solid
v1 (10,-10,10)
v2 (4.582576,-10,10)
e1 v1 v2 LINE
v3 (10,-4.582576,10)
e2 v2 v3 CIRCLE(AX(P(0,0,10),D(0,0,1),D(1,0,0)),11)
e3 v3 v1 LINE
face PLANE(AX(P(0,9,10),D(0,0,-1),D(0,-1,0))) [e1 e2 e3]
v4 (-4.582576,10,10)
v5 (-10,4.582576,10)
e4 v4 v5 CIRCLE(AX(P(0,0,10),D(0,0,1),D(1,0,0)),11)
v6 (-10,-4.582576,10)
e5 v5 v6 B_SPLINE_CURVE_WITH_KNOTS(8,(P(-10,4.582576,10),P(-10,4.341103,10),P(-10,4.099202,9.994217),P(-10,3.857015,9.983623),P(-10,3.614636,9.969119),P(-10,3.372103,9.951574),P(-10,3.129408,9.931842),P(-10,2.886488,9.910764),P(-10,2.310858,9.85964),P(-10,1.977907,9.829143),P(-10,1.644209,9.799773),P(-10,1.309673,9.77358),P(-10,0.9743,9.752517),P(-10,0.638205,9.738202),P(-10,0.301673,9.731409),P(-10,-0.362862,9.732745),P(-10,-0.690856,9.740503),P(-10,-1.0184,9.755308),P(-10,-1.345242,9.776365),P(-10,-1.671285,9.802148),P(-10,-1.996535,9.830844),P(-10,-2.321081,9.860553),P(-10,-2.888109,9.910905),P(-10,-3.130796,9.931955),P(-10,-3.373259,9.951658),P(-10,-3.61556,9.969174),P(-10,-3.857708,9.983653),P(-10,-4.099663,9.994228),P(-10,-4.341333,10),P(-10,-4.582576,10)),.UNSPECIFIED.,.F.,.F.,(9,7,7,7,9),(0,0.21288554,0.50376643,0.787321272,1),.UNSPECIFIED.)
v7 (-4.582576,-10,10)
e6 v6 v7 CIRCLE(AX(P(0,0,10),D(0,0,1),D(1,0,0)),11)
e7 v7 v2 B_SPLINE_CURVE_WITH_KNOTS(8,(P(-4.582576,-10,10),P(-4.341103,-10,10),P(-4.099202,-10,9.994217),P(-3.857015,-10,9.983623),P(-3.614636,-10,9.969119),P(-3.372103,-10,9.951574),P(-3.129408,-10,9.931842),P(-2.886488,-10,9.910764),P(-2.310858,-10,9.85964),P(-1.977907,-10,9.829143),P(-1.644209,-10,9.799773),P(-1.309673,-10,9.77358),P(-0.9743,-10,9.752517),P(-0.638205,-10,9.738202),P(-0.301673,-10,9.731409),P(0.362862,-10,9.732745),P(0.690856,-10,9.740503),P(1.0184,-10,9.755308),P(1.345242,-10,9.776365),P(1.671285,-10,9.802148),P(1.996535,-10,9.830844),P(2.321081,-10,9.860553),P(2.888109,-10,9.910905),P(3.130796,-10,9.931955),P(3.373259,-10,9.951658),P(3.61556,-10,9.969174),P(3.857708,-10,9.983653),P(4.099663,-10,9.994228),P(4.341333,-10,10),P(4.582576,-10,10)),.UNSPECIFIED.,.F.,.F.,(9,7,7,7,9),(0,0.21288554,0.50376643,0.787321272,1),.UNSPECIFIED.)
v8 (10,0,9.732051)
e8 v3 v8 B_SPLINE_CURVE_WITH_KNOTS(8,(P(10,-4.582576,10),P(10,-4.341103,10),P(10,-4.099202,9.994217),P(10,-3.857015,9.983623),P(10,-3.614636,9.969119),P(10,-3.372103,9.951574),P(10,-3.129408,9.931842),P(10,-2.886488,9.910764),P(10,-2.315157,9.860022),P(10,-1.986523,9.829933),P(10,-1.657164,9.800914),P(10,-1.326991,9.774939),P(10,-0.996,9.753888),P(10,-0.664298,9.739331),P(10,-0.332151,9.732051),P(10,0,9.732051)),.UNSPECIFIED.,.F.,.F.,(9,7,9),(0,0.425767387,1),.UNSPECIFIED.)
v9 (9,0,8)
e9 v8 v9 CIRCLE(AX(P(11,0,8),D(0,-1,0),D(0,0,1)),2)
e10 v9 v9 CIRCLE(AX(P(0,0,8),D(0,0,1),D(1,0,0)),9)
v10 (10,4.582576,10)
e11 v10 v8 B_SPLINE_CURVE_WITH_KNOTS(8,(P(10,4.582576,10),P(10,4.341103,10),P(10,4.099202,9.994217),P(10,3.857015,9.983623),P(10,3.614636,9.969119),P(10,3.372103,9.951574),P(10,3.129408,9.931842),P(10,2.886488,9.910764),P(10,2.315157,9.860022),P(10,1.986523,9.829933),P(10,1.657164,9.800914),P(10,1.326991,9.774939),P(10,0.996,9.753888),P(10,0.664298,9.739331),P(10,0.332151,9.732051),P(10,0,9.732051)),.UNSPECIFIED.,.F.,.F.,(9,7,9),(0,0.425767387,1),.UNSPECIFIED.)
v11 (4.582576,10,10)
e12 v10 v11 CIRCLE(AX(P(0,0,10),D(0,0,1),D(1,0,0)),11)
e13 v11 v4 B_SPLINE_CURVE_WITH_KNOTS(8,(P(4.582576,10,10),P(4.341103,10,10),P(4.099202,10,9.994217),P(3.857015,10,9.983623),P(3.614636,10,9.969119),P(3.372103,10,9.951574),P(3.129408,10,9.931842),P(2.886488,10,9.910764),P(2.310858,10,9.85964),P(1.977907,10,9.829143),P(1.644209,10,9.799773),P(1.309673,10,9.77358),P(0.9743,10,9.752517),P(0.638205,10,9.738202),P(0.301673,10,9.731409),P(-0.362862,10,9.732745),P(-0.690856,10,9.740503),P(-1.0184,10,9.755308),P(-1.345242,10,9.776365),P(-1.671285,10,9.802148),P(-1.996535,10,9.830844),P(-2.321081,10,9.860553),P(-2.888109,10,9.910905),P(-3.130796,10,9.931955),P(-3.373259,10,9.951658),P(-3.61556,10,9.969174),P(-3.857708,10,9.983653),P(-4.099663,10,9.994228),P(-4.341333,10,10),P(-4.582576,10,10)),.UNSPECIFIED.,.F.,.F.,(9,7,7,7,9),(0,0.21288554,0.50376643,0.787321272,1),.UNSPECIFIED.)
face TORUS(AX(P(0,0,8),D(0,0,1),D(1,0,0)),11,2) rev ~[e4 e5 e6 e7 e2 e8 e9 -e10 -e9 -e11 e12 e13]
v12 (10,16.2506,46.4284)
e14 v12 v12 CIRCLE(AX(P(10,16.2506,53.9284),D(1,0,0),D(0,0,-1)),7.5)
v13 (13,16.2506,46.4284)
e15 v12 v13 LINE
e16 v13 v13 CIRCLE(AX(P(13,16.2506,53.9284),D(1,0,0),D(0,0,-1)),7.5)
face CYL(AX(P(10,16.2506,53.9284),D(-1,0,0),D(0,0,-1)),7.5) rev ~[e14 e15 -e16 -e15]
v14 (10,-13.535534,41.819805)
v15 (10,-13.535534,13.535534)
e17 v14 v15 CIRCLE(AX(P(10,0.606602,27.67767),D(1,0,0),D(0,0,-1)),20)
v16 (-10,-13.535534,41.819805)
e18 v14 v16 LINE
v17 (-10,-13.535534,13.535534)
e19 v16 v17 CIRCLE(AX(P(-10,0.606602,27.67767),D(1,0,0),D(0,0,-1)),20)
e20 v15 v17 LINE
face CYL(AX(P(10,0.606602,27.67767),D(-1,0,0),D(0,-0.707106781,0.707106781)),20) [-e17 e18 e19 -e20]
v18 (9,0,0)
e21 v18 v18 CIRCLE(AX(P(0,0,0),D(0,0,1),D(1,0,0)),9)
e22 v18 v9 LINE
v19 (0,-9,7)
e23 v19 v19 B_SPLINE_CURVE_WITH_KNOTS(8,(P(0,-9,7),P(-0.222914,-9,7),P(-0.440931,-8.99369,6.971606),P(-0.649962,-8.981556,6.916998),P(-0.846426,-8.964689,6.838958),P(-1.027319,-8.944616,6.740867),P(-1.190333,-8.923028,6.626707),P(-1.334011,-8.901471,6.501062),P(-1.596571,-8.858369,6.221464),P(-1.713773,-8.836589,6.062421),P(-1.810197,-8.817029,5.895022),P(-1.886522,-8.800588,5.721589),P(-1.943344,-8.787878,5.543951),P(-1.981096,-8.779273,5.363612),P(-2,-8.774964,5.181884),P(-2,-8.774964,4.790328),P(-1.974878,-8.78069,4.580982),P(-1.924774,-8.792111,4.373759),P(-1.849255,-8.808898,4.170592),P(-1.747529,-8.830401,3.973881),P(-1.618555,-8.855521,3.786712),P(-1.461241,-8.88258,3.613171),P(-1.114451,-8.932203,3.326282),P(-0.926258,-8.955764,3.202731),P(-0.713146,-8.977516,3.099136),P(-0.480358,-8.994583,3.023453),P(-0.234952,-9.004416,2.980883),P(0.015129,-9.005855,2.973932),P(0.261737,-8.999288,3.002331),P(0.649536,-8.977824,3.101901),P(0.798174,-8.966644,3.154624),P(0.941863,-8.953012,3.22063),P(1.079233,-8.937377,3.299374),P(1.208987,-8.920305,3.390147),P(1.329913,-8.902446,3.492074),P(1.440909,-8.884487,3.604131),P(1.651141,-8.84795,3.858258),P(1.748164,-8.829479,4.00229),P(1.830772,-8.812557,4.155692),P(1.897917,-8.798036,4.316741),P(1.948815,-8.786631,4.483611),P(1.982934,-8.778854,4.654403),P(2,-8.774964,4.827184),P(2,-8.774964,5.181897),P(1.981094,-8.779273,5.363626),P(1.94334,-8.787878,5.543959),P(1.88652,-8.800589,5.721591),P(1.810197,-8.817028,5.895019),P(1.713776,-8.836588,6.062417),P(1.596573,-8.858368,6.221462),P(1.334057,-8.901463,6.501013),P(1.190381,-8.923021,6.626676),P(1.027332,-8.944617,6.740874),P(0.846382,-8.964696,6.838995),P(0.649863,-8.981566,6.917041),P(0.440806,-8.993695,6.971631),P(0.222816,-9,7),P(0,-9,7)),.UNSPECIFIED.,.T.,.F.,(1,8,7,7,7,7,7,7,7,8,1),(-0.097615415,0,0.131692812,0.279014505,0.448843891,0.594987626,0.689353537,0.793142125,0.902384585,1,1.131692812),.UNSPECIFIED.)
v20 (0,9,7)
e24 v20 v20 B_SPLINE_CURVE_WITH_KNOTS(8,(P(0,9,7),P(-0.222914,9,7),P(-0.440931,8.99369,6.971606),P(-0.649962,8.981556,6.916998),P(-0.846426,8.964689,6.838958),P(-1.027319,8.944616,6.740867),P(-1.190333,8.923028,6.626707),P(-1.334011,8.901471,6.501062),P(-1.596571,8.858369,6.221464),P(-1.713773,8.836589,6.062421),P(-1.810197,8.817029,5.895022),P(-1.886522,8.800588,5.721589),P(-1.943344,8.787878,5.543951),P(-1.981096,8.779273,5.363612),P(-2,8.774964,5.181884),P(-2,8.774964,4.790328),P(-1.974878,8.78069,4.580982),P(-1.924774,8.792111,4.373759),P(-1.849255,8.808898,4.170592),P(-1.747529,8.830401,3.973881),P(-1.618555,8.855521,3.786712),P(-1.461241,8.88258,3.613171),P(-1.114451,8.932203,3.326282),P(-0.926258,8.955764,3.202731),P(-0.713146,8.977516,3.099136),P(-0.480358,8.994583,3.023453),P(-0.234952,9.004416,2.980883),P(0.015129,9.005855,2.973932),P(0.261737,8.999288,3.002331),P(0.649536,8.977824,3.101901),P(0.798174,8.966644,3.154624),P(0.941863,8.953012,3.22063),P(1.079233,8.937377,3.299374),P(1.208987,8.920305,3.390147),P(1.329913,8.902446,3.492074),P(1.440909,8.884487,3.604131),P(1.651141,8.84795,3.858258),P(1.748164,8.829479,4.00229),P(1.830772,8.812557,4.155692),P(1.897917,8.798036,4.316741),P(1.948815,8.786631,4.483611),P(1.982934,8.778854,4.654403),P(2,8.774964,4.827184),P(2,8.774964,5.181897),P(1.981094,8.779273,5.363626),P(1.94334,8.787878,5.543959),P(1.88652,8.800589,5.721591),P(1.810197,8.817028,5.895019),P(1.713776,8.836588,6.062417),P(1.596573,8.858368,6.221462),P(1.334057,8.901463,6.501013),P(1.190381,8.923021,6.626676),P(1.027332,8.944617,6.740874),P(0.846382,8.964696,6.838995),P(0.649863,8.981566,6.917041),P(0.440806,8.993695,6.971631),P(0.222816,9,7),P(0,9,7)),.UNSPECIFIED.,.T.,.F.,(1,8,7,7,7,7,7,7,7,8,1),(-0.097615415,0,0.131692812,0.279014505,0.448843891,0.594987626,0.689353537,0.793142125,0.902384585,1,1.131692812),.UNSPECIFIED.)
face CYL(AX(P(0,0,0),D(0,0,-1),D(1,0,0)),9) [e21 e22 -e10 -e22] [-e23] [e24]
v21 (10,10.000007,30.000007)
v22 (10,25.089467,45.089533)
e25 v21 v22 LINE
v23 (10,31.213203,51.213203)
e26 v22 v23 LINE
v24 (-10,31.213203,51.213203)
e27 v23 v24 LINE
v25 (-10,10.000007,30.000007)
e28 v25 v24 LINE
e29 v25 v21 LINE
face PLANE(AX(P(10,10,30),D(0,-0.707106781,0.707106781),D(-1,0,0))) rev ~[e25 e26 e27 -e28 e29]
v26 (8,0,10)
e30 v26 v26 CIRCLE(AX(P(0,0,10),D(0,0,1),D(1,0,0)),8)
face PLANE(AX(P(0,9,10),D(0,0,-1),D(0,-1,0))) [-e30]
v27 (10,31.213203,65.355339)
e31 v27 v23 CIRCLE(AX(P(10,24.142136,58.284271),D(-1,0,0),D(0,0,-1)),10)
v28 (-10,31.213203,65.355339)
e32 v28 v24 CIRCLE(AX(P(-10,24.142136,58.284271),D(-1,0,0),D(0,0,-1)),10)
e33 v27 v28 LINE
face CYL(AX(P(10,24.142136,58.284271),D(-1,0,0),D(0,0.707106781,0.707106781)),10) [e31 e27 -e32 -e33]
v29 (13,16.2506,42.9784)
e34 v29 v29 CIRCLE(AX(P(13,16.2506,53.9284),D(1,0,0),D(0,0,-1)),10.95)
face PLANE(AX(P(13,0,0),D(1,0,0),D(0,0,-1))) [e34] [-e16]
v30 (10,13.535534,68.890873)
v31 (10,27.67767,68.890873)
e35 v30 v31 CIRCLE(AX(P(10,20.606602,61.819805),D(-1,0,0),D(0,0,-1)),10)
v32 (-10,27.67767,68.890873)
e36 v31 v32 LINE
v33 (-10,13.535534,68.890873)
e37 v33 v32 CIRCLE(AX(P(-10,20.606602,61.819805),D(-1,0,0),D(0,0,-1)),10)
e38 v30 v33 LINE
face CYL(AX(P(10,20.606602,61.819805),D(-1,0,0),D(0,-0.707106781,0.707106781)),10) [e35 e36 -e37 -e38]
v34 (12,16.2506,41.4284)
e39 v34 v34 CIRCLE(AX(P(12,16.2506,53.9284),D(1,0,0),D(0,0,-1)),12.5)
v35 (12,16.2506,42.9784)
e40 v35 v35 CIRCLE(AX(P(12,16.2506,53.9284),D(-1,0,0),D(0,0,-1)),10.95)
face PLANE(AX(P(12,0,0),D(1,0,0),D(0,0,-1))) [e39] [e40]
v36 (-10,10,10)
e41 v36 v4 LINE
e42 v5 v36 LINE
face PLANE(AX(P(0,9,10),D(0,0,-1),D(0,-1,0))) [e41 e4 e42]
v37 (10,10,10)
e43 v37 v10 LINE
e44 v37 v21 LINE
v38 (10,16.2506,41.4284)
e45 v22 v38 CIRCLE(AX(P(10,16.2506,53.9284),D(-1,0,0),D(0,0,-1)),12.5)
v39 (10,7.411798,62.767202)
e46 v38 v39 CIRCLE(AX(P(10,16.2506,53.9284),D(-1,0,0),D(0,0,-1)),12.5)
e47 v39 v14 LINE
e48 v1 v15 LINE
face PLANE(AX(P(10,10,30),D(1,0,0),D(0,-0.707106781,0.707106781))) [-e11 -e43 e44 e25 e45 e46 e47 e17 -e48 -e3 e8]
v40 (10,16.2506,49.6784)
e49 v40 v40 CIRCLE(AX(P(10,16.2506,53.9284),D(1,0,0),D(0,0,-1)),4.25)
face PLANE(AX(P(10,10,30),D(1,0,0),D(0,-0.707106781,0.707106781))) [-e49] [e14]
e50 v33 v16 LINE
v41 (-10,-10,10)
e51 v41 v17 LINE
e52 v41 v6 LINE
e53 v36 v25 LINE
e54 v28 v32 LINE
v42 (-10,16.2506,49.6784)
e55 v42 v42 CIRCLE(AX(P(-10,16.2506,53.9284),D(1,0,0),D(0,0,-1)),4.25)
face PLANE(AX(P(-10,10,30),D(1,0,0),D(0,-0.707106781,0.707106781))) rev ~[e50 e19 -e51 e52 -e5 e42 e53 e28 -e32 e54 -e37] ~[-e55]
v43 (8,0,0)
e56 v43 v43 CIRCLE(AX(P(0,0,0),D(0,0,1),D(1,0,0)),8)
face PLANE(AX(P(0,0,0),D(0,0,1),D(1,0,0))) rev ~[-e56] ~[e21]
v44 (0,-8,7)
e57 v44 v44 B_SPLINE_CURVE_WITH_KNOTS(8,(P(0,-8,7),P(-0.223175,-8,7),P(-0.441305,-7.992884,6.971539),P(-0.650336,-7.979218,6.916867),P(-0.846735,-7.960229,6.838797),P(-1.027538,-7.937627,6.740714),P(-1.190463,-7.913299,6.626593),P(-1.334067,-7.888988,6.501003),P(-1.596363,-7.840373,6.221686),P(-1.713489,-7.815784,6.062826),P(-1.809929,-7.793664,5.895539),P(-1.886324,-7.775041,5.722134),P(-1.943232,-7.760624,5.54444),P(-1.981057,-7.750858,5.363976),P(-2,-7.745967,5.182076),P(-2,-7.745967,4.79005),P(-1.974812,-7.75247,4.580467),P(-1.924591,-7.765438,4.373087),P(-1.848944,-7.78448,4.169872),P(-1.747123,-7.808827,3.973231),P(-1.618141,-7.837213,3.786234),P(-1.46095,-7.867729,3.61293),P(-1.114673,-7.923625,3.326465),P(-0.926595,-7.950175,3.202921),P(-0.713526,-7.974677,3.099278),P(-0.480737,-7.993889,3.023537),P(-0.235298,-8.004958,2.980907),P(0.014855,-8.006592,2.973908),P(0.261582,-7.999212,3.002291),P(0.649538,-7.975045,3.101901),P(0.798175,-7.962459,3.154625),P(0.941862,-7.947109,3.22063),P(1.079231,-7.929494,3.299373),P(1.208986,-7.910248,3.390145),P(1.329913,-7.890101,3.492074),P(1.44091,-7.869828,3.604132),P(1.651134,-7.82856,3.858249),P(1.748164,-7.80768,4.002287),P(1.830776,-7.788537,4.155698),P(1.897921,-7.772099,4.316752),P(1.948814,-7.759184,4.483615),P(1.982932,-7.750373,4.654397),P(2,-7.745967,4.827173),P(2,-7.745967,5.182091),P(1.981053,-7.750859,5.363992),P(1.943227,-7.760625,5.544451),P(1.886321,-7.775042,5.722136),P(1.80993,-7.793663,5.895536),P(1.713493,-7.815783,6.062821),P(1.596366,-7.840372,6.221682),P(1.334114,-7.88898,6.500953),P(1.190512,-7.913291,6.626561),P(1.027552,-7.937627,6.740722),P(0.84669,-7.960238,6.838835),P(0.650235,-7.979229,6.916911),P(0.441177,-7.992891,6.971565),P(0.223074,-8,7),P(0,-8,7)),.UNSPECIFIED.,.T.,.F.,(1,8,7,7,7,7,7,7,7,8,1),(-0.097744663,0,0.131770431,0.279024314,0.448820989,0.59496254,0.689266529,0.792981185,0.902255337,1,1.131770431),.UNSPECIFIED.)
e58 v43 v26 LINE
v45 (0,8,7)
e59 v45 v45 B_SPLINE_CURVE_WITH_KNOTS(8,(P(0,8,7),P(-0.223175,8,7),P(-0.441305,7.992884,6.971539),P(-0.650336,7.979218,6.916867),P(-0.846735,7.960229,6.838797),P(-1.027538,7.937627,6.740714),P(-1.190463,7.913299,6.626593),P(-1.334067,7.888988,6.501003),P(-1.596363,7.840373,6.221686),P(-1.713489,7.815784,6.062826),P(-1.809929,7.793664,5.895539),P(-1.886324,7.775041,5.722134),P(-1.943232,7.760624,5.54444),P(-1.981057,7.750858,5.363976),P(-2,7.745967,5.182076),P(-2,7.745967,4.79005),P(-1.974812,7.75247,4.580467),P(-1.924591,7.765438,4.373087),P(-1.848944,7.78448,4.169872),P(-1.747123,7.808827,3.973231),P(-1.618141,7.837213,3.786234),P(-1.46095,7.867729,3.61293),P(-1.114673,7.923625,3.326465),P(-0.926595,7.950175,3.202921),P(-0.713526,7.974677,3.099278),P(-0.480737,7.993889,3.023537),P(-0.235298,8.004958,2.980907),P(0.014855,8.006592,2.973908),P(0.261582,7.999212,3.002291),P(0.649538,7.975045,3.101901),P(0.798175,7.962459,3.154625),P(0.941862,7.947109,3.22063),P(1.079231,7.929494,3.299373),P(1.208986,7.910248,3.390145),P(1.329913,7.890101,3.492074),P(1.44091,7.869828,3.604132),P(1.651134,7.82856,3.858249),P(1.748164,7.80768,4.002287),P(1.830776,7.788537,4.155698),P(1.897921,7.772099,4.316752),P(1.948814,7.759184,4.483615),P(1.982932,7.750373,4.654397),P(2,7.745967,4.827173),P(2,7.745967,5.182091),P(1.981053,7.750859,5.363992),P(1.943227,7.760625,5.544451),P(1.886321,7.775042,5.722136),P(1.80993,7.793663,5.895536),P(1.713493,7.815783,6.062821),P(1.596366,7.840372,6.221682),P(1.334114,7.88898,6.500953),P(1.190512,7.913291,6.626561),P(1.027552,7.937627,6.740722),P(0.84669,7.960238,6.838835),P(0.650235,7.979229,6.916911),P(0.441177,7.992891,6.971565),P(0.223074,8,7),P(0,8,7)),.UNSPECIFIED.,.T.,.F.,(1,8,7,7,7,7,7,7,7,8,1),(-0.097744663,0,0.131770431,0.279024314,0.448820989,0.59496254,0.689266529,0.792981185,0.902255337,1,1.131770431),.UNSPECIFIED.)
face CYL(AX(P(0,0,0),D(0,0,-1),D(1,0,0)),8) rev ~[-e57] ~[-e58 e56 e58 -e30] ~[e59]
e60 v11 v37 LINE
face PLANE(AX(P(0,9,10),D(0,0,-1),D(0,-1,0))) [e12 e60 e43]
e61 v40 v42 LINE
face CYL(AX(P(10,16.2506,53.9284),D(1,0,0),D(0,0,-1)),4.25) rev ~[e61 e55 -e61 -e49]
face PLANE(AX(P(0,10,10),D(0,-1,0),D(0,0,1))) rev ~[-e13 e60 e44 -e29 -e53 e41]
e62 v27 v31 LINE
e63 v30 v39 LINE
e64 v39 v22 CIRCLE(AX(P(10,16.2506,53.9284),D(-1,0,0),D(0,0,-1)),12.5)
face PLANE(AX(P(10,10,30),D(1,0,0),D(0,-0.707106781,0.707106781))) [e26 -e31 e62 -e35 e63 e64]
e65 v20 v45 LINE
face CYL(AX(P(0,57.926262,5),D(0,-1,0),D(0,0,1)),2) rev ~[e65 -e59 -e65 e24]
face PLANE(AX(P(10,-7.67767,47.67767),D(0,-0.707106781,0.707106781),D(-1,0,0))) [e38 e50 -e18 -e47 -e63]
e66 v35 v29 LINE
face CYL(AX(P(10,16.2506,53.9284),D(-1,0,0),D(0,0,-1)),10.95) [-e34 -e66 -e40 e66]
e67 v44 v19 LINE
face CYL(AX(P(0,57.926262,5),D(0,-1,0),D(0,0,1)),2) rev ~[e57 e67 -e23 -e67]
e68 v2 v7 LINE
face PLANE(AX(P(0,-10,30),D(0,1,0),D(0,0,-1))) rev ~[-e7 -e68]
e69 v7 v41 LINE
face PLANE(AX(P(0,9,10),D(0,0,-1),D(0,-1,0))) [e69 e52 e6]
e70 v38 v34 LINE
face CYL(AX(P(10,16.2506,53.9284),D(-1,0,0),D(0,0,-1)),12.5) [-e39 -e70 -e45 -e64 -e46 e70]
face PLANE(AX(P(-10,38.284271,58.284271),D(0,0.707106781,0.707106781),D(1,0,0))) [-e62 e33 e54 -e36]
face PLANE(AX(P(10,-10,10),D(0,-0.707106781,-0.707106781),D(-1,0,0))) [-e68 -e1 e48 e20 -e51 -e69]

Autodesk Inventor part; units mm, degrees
ref_plane "YZ Plane" through (0, 0, 0) normal (1, 0, 0) x (0, 1, 0)
sketch "Esquisse1" plane through (0, 0, 0) normal (0, 0, 1) x (1, 0, 0)
  circle A0 centre (0, 0) radius 8
  circle A1 centre (0, 0) radius 9
  dimension "d0" = 16
  dimension "d1" = 18
extrude "Extrusion1" add sketch "Esquisse1" along normal blind 10
sketch "Esquisse2" plane through (0, 0, 0) normal (1, 0, 0) x (0, 1, 0)
  line L0 (9, 10) -> (-9, 10) projected
  line L1 (0, 10) -> (0, 25)
  line L2 (9, 10) -> (-9, 10)
  line L3 (0, 10) -> (10, 10)
  line L4 (10, 10) -> (10, 30)
  line L5 (10, 30) -> (-10, 30)
  line L6 (-10, 30) -> (-10, 10)
  line L7 (-10, 10) -> (0, 10)
  point P0 (0, 0)
  dimension "d26" = 10
  dimension "d27" = 20
  dimension "d28" = 20
  dimension "d29" = 90
extrude "Extrusion2" add sketch "Esquisse2" along normal mid plane 20
fillet "Congé1" radius 2 1 edges at (-9, 0, 10)
sketch "Esquisse4" plane through (0, 0, 0) normal (0, 1, 0) x (-1, 0, 0)
  line L0 (9, 0) -> (-9, 0) projected
  line L1 (9, 0) -> (0, 0)
  line L2 (0, 0) -> (0, 5)
  line L3 (0, 0) -> (5, 0) construction
  dimension "d14" = 9
  dimension "d15" = 5
  dimension "d16" = 90
hole "Perçage1" at (0, 0, 5) direction (0, -1, 0) diameter 4 end through all both
ref_plane "Plan de construction2" through (0, -8.75, 15.1554) normal (0, -0.5, 0.8660254) x (1, 0, 0)
ref_plane "Plan de construction1" through (0, 0, 0) normal (0, -0.5, 0.8660254) x (1, 0, 0)
ref_plane "Plan de construction4" through (0, -10, 10) normal (0, -0.7071068, 0.7071068) x (1, 0, 0)
ref_plane "Plan de construction3" through (0, 0, 0) normal (0, -0.7071068, 0.7071068) x (1, 0, 0)
sketch "Esquisse6" plane through (0, -10, 10) normal (0, -0.7071068, 0.7071068) x (1, 0, 0)
  line L0 (-10, 28.2843) -> (-10, 14.1421) projected
  line L1 (10, 14.1421) -> (10, 0) projected
  line L2 (-10, 28.2843) -> (10, 28.2843)
  line L3 (10, 28.2843) -> (10, 0)
  line L4 (10, 0) -> (-10, 0)
  line L5 (-10, 0) -> (-10, 28.2843)
  line L6 (-10, 28.2843) -> (10, 28.2843) projected
  line L7 (10, 14.1421) -> (10, 28.2843) projected
  line L8 (4.5826, 14.1421) -> (10, 14.1421) projected
  line L9 (-10, 14.1421) -> (-4.5826, 14.1421) projected
  line L10 (-10, 28.2843) -> (-10, 14.1421) projected
  point P0 (0, 0)
extrude "Extrusion4" add sketch "Esquisse6" along normal blind 25
sketch "Esquisse8" plane through (-10, 10, 30) normal (0, 0.7071068, 0.7071068) x (1, 0, 0)
  line L0 (20, 0) -> (0, 0) projected
  line L1 (0, 0) -> (0, -25) projected
  line L2 (20, -25) -> (0, -25) projected
  line L3 (20, 0) -> (20, -25) projected
  point P0 (10, 14.1422)
extrude "Extrusion5" add sketch "Esquisse8" along normal blind 40
fillet "Congé4" radius 20 1 edges at (0, -27.6777, 27.6777)
fillet "Congé5" radius 10 2 edges at (0, 38.2842, 58.2843) (0, 20.6066, 75.962)
sketch "Esquisse9" plane through (10, 0, 0) normal (1, 0, 0) x (0, 0, -1)
  line L0 (-41.8199, -13.5356) -> (-68.8909, 13.5355) projected
  line L1 (-30, 9.9999) -> (-51.2132, 31.2132) projected
  line L2 (-68.8909, 27.6776) -> (-65.3554, 31.2132) projected
  arc A0 (-68.8909, 27.6776) -> (-68.8909, 13.5355) centre (-61.8199, 20.6066) ccw projected
  circle A1 centre (-53.9284, 16.2506) radius 4.25
  point P0 (0, 0)
  point P1 (-67.1232, 29.4454)
  point P2 (-71.8199, 20.6066)
  dimension "d48" = 8.5
extrude "Extrusion6" cut sketch "Esquisse9" against normal through all
sketch "Esquisse10" plane through (10, 0, 0) normal (1, 0, 0) x (0, 0, -1)
  circle A0 centre (-53.9284, 16.2506) radius 4.25 projected
  circle A1 centre (-53.9284, 16.2506) radius 7.5
  circle A2 centre (-53.9284, 16.2506) radius 10.95
  point P0 (0, 0)
  dimension "d49" = 15
  dimension "d50" = 21.9
extrude "Extrusion7" add sketch "Esquisse10" along normal blind 3 contours A2
sketch "Esquisse11" plane through (10, 0, 0) normal (1, 0, 0) x (0, 0, -1)
  circle A0 centre (-53.9284, 16.2506) radius 10.95 projected
  circle A1 centre (-53.9284, 16.2506) radius 7.5 projected
  circle A2 centre (-53.9284, 16.2506) radius 4.25 projected
  circle A3 centre (-53.9284, 16.2506) radius 12.5
  line L0 (-30, 9.9999) -> (-51.2132, 31.2132) projected
  point P0 (0, 0)
extrude "Extrusion8" add sketch "Esquisse11" along normal blind 2 contours A0 | A3
properties part number "bielle roue milieu"
